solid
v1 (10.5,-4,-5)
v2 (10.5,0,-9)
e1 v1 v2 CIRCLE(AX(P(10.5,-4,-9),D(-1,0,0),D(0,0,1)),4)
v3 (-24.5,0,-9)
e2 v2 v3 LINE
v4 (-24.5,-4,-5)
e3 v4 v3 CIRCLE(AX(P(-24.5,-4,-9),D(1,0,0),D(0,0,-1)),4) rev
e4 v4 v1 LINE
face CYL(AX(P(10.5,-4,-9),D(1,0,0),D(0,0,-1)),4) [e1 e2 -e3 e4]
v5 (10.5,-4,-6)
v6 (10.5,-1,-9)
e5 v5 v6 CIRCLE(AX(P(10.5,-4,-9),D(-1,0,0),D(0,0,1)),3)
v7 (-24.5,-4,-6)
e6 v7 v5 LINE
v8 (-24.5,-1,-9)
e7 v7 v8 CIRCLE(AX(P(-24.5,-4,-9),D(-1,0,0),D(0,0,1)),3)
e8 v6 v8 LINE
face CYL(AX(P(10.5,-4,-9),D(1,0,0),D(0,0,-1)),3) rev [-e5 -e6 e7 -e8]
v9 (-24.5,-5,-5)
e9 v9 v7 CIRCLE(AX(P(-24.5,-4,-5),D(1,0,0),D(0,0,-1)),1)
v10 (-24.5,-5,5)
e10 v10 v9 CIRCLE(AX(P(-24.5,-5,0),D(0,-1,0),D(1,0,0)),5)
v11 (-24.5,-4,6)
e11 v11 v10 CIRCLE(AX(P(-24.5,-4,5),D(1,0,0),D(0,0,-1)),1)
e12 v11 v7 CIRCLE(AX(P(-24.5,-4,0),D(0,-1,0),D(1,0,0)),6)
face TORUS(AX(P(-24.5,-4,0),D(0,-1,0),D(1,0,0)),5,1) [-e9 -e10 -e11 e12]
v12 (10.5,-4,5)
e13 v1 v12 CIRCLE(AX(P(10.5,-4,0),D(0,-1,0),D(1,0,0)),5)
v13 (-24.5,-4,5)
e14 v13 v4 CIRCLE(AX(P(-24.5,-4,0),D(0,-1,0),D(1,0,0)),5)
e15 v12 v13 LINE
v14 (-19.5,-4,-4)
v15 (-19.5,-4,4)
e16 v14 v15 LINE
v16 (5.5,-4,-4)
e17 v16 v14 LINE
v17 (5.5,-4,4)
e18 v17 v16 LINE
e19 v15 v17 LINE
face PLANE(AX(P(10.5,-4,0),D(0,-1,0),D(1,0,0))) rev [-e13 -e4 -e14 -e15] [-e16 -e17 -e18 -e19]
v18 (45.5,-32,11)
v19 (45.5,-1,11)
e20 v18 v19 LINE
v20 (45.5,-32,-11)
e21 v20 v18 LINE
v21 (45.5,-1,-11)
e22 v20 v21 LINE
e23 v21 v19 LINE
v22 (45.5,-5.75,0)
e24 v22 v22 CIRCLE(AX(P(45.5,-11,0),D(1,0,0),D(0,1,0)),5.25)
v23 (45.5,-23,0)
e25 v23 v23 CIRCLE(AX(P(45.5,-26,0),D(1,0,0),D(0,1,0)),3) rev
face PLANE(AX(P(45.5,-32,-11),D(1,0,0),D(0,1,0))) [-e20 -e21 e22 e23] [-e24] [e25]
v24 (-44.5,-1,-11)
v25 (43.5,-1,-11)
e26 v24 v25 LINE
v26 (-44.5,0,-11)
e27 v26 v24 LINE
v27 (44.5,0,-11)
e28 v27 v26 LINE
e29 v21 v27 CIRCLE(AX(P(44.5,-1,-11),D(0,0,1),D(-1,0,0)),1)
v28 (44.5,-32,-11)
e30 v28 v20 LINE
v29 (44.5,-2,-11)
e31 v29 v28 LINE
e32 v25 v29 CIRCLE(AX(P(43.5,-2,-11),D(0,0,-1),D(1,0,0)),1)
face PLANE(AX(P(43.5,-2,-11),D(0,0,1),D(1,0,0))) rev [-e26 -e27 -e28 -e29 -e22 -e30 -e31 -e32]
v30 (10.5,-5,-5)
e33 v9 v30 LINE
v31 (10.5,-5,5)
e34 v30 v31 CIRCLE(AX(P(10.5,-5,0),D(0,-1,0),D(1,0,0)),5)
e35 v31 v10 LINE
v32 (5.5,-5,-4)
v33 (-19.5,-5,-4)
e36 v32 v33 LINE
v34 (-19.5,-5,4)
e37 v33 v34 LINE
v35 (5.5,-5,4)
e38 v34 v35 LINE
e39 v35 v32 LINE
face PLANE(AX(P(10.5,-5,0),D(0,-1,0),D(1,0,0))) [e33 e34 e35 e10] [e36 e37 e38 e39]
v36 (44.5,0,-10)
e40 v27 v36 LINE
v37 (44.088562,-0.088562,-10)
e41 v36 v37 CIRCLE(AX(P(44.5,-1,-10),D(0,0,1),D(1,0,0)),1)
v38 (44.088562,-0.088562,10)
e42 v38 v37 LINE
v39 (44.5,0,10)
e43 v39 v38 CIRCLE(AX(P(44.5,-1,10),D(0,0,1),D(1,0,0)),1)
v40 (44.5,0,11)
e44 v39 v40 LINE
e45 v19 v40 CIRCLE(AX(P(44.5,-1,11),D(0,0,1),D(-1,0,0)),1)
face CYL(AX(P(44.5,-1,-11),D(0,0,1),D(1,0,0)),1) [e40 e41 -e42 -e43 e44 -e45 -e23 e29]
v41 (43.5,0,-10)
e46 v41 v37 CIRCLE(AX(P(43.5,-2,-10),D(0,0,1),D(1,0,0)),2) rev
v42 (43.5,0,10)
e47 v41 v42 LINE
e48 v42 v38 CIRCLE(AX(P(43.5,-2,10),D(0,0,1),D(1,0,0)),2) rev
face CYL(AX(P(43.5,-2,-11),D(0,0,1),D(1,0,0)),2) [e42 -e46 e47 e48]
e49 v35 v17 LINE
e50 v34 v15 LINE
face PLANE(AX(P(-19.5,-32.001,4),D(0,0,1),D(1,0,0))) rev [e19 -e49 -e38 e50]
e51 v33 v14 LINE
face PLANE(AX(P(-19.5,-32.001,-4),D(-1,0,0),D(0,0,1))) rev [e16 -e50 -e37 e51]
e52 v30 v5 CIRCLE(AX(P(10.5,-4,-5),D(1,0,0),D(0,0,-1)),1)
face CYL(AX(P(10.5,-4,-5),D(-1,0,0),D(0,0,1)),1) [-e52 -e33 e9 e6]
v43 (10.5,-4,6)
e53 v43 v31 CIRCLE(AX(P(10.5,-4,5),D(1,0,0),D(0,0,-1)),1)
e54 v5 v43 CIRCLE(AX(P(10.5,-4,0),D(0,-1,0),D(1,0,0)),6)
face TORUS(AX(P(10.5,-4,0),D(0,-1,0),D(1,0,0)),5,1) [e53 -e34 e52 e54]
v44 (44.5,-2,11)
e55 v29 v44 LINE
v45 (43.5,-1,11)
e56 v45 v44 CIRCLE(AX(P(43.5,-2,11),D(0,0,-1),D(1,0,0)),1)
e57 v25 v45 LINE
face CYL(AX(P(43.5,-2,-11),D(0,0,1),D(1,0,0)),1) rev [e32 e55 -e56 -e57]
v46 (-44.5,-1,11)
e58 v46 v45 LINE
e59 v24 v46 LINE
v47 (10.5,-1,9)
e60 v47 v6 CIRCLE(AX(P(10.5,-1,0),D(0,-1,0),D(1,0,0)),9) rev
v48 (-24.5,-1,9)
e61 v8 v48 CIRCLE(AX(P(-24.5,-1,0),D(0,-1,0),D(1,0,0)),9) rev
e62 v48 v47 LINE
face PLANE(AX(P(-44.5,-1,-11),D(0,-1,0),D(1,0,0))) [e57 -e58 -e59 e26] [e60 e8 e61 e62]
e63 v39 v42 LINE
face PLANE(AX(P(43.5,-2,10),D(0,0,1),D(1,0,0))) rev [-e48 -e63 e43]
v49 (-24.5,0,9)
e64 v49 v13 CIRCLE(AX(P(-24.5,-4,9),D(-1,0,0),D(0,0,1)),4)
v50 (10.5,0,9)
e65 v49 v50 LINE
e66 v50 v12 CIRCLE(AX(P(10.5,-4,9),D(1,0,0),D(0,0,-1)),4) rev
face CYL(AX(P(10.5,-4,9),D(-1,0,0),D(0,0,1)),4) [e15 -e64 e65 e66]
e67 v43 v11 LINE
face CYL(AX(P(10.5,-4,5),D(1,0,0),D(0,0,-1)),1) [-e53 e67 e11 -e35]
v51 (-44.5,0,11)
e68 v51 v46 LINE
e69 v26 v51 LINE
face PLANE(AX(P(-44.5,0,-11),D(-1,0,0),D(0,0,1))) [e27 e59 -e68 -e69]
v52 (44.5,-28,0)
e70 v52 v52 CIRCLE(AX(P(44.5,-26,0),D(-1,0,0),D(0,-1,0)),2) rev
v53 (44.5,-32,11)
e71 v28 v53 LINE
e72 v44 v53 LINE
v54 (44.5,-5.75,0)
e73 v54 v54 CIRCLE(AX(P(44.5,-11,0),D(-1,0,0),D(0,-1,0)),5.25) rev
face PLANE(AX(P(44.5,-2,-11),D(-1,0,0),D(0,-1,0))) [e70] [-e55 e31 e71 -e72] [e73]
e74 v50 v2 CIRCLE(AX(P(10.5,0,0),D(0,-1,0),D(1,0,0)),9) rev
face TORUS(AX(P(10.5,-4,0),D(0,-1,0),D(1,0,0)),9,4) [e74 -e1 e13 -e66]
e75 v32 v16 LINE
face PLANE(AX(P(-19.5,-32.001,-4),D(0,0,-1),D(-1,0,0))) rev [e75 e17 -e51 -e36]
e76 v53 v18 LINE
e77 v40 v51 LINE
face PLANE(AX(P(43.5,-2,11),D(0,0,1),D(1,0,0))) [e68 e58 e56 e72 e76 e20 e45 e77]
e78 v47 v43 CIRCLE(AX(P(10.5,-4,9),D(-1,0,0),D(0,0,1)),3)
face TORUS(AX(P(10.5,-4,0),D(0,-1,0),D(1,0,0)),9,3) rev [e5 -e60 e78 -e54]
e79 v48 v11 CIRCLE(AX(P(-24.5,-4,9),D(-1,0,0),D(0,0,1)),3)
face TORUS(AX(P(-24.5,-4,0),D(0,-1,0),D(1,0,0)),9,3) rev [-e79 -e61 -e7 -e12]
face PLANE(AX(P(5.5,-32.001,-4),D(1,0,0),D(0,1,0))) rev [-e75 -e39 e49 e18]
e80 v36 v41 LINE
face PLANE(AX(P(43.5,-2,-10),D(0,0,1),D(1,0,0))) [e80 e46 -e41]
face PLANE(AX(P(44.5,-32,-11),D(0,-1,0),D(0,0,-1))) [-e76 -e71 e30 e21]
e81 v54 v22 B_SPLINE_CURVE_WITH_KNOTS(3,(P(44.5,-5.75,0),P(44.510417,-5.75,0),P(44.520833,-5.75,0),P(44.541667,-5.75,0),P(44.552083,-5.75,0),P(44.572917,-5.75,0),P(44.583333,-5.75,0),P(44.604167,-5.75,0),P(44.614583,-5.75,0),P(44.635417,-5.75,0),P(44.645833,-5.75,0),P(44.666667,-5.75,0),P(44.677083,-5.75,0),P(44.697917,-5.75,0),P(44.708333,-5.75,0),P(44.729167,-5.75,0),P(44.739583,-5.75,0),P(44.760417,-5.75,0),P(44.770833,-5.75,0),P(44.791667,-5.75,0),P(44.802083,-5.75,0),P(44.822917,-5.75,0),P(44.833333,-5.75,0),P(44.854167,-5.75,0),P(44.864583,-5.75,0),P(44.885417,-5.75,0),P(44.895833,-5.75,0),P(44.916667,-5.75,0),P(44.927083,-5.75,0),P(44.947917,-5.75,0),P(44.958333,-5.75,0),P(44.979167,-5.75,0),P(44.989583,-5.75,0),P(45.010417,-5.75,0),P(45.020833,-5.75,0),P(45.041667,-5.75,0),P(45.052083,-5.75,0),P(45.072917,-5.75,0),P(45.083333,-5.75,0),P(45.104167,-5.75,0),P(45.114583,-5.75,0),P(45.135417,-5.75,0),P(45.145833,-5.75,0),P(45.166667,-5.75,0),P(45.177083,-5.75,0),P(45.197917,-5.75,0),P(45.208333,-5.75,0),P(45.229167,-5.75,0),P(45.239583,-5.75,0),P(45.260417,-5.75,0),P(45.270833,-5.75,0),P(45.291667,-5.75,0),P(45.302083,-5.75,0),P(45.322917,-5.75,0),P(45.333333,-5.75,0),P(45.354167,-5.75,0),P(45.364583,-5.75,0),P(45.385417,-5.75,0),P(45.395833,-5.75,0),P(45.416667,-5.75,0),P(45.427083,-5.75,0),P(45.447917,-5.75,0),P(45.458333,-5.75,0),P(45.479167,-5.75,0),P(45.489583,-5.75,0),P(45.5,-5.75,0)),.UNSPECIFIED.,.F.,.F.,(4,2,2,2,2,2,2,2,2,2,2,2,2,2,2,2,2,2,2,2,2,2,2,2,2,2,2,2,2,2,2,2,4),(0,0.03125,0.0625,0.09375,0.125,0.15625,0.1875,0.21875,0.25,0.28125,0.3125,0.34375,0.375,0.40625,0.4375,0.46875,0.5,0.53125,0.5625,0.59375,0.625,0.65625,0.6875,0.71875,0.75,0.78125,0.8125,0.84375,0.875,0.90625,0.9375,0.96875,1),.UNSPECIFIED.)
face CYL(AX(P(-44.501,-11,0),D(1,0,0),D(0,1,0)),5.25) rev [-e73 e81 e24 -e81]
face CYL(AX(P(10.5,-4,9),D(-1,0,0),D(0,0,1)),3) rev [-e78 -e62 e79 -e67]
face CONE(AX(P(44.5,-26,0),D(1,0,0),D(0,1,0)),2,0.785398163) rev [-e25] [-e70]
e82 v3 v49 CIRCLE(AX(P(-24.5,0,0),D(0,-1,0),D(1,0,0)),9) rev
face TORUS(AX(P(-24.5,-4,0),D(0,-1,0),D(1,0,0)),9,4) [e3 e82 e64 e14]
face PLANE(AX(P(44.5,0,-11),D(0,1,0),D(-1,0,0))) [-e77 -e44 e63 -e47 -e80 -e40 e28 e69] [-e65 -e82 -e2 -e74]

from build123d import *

# Parameters (mm, degrees)
BOSS_EXTRUDE1_DEPTH      = 11
BOSS_EXTRUDE1_DEPTH_BACK = 11
CUT_EXTRUDE1_REACH       = 98.151
SKETCH2_R                = 5.25
SKETCH2_R_2              = 2
BOSS_EXTRUDE2_DEPTH      = 4
FILLET1_R                = 3
FILLET2_R                = 1
SHELL1_START             = -24.5
SHELL1_DEPTH             = 35
SHELL1_START_2           = -10
SHELL1_2_DEPTH           = 20
CUT_EXTRUDE2_REACH       = 56.546
SKETCH4_W                = 25
SKETCH4_H                = 8
CHAMFER1_SIZE            = 1
DELETEFACE2_START        = -10
DELETEFACE2_DEPTH        = 20


with BuildPart() as part:
    # Sketch1 → Boss-Extrude1 (new, two sides: drawn at the far end of the back side and taken through both)
    with BuildSketch(Plane.XY.offset(-BOSS_EXTRUDE1_DEPTH_BACK)):
        with BuildLine():
            Line((-44.5, 0), (-44.5, -1))
            Line((-44.5, -1), (43.5, -1))
            ThreePointArc((43.5, -1), (44.207106781, -1.292893219), (44.5, -2))
            Line((44.5, -2), (44.5, -32))
            Line((44.5, -32), (45.5, -32))
            Line((45.5, -32), (45.5, -1))
            ThreePointArc((45.5, -1), (45.207106781, -0.292893219), (44.5, 0))
            Line((44.5, 0), (-44.5, 0))
        make_face()
    extrude(amount=BOSS_EXTRUDE1_DEPTH + BOSS_EXTRUDE1_DEPTH_BACK)

    # Sketch2 → Cut-Extrude1 (cut, up to next)
    with BuildSketch(Plane(origin=(45.5, 0, 0), x_dir=(0, 0, -1), z_dir=(1, 0, 0)), mode=Mode.PRIVATE) as cut_extrude1_sk1:
        with Locations(Location((0, -11, 0), (0, 0, 90))):
            Circle(SKETCH2_R)
    cut_extrude1_tool1 = extrude(cut_extrude1_sk1.sketch, amount=-CUT_EXTRUDE1_REACH, mode=Mode.PRIVATE) & part.part
    # Sketch2 → Cut-Extrude1 (cut, up to next)
    with BuildSketch(Plane(origin=(45.5, 0, 0), x_dir=(0, 0, -1), z_dir=(1, 0, 0)), mode=Mode.PRIVATE) as cut_extrude1_sk2:
        with Locations(Location((0, -26, 0), (0, 0, 90))):
            Circle(SKETCH2_R_2)
    cut_extrude1_tool2 = extrude(cut_extrude1_sk2.sketch, amount=-CUT_EXTRUDE1_REACH, mode=Mode.PRIVATE) & part.part
    add(cut_extrude1_tool1.solids().sort_by_distance((45.5, -11, 0))[0], mode=Mode.SUBTRACT)
    add(cut_extrude1_tool2.solids().sort_by_distance((45.5, -26, 0))[0], mode=Mode.SUBTRACT)

    # Sketch3 → Boss-Extrude2 (add)
    with BuildSketch(Plane.XZ.offset(1)):
        with BuildLine():
            Line((10.5, -6), (-24.5, -6))
            ThreePointArc((-24.5, -6), (-30.5, 0), (-24.5, 6))
            Line((-24.5, 6), (10.5, 6))
            ThreePointArc((10.5, 6), (16.5, 0), (10.5, -6))
        make_face()
    extrude(amount=BOSS_EXTRUDE2_DEPTH)

    # Fillet1
    fillet1_edges = [part.edges().sort_by_distance(p)[0] for p in [
        (16.5, -1, 0),
        (-7, -1, 6),
        (-30.5, -1, 0),
        (-7, -1, -6),
    ]]
    fillet(fillet1_edges, radius=FILLET1_R)

    # Fillet2
    fillet2_edges = [part.edges().sort_by_distance(p)[0] for p in [
        (16.5, -5, 0),
        (-7, -5, -6),
        (-30.5, -5, 0),
        (-7, -5, 6),
    ]]
    fillet(fillet2_edges, radius=FILLET2_R - 0.0001)  # a hair under: the kernel refuses the full size

    # Shell1: read off the stored shape, not the designer's step
    # Shell1 outline → Shell1 (cut)
    with BuildSketch(Plane.YZ.offset(SHELL1_START)):
        with BuildLine():
            Line((0, -9), (0, 9))
            ThreePointArc((0, 9), (-1.171572875, 6.171572875), (-4, 5))
            Line((-4, 5), (-4, -5))
            ThreePointArc((-4, -5), (-1.171572875, -6.171572875), (0, -9))
        make_face()
    extrude(amount=SHELL1_DEPTH, mode=Mode.SUBTRACT)

    # Shell1 2 outline → Shell1 2 (cut)
    with BuildSketch(Plane.XY.offset(SHELL1_START_2)):
        with BuildLine():
            ThreePointArc((43.5, 0), (44.01763809, -0.068148347), (44.5, -0.267949192))
            Line((44.5, -0.267949192), (44.5, 0))
            Line((44.5, 0), (43.5, 0))
        make_face()
    extrude(amount=SHELL1_2_DEPTH, mode=Mode.SUBTRACT)

    # Shell1 3 outline → Shell1 3 (revolve, cut)
    with BuildSketch(Plane(origin=(10.5, 0, 0), x_dir=(1, 0, 0), z_dir=(0, 0, 1))):
        with BuildLine():
            Line((9, 0), (0, 0))
            Line((0, 0), (0, -4))
            Line((0, -4), (5, -4))
            ThreePointArc((5, -4), (6.171572875, -1.171572875), (9, 0))
        make_face()
    revolve(axis=Axis((10.5, 0, 0), (0, 1, 0)), mode=Mode.SUBTRACT)

    # Shell1 4 outline → Shell1 4 (revolve, cut)
    with BuildSketch(Plane(origin=(-24.5, 0, 0), x_dir=(1, 0, 0), z_dir=(0, 0, 1))):
        with BuildLine():
            Line((9, 0), (0, 0))
            Line((0, 0), (0, -4))
            Line((0, -4), (5, -4))
            ThreePointArc((5, -4), (6.171572875, -1.171572875), (9, 0))
        make_face()
    revolve(axis=Axis((-24.5, 0, 0), (0, 1, 0)), mode=Mode.SUBTRACT)

    # Sketch4 → Cut-Extrude2 (cut, up to next)
    with BuildSketch(Plane(origin=(0, -4, 0), x_dir=(1, 0, 0), z_dir=(0, 1, 0)), mode=Mode.PRIVATE) as cut_extrude2_sk1:
        with Locations((-7, 0)):
            Rectangle(SKETCH4_W, SKETCH4_H)
    cut_extrude2_tool1 = extrude(cut_extrude2_sk1.sketch, amount=-CUT_EXTRUDE2_REACH, mode=Mode.PRIVATE) & part.part
    add(cut_extrude2_tool1.solids().sort_by_distance((-7, -4, 0))[0], mode=Mode.SUBTRACT)

    # Chamfer1
    chamfer1_edges = [part.edges().sort_by_distance(p)[0] for p in [
        (45.5, -28, 0),
    ]]
    chamfer(chamfer1_edges, length=CHAMFER1_SIZE - 0.0001)  # a hair under: the kernel refuses the full size

    # DeleteFace2: read off the stored shape, not the designer's step
    # DeleteFace2 outline → DeleteFace2 (add)
    with BuildSketch(Plane.XY.offset(DELETEFACE2_START)):
        with BuildLine():
            Line((44.5, -0.267949192), (44.5, 0))
            ThreePointArc((44.5, 0), (44.289569284, -0.022391226), (44.088562172, -0.088562172))
            ThreePointArc((44.088562172, -0.088562172), (44.299329325, -0.166677161), (44.5, -0.267949192))
        make_face()
    extrude(amount=DELETEFACE2_DEPTH)


solid = part.part
